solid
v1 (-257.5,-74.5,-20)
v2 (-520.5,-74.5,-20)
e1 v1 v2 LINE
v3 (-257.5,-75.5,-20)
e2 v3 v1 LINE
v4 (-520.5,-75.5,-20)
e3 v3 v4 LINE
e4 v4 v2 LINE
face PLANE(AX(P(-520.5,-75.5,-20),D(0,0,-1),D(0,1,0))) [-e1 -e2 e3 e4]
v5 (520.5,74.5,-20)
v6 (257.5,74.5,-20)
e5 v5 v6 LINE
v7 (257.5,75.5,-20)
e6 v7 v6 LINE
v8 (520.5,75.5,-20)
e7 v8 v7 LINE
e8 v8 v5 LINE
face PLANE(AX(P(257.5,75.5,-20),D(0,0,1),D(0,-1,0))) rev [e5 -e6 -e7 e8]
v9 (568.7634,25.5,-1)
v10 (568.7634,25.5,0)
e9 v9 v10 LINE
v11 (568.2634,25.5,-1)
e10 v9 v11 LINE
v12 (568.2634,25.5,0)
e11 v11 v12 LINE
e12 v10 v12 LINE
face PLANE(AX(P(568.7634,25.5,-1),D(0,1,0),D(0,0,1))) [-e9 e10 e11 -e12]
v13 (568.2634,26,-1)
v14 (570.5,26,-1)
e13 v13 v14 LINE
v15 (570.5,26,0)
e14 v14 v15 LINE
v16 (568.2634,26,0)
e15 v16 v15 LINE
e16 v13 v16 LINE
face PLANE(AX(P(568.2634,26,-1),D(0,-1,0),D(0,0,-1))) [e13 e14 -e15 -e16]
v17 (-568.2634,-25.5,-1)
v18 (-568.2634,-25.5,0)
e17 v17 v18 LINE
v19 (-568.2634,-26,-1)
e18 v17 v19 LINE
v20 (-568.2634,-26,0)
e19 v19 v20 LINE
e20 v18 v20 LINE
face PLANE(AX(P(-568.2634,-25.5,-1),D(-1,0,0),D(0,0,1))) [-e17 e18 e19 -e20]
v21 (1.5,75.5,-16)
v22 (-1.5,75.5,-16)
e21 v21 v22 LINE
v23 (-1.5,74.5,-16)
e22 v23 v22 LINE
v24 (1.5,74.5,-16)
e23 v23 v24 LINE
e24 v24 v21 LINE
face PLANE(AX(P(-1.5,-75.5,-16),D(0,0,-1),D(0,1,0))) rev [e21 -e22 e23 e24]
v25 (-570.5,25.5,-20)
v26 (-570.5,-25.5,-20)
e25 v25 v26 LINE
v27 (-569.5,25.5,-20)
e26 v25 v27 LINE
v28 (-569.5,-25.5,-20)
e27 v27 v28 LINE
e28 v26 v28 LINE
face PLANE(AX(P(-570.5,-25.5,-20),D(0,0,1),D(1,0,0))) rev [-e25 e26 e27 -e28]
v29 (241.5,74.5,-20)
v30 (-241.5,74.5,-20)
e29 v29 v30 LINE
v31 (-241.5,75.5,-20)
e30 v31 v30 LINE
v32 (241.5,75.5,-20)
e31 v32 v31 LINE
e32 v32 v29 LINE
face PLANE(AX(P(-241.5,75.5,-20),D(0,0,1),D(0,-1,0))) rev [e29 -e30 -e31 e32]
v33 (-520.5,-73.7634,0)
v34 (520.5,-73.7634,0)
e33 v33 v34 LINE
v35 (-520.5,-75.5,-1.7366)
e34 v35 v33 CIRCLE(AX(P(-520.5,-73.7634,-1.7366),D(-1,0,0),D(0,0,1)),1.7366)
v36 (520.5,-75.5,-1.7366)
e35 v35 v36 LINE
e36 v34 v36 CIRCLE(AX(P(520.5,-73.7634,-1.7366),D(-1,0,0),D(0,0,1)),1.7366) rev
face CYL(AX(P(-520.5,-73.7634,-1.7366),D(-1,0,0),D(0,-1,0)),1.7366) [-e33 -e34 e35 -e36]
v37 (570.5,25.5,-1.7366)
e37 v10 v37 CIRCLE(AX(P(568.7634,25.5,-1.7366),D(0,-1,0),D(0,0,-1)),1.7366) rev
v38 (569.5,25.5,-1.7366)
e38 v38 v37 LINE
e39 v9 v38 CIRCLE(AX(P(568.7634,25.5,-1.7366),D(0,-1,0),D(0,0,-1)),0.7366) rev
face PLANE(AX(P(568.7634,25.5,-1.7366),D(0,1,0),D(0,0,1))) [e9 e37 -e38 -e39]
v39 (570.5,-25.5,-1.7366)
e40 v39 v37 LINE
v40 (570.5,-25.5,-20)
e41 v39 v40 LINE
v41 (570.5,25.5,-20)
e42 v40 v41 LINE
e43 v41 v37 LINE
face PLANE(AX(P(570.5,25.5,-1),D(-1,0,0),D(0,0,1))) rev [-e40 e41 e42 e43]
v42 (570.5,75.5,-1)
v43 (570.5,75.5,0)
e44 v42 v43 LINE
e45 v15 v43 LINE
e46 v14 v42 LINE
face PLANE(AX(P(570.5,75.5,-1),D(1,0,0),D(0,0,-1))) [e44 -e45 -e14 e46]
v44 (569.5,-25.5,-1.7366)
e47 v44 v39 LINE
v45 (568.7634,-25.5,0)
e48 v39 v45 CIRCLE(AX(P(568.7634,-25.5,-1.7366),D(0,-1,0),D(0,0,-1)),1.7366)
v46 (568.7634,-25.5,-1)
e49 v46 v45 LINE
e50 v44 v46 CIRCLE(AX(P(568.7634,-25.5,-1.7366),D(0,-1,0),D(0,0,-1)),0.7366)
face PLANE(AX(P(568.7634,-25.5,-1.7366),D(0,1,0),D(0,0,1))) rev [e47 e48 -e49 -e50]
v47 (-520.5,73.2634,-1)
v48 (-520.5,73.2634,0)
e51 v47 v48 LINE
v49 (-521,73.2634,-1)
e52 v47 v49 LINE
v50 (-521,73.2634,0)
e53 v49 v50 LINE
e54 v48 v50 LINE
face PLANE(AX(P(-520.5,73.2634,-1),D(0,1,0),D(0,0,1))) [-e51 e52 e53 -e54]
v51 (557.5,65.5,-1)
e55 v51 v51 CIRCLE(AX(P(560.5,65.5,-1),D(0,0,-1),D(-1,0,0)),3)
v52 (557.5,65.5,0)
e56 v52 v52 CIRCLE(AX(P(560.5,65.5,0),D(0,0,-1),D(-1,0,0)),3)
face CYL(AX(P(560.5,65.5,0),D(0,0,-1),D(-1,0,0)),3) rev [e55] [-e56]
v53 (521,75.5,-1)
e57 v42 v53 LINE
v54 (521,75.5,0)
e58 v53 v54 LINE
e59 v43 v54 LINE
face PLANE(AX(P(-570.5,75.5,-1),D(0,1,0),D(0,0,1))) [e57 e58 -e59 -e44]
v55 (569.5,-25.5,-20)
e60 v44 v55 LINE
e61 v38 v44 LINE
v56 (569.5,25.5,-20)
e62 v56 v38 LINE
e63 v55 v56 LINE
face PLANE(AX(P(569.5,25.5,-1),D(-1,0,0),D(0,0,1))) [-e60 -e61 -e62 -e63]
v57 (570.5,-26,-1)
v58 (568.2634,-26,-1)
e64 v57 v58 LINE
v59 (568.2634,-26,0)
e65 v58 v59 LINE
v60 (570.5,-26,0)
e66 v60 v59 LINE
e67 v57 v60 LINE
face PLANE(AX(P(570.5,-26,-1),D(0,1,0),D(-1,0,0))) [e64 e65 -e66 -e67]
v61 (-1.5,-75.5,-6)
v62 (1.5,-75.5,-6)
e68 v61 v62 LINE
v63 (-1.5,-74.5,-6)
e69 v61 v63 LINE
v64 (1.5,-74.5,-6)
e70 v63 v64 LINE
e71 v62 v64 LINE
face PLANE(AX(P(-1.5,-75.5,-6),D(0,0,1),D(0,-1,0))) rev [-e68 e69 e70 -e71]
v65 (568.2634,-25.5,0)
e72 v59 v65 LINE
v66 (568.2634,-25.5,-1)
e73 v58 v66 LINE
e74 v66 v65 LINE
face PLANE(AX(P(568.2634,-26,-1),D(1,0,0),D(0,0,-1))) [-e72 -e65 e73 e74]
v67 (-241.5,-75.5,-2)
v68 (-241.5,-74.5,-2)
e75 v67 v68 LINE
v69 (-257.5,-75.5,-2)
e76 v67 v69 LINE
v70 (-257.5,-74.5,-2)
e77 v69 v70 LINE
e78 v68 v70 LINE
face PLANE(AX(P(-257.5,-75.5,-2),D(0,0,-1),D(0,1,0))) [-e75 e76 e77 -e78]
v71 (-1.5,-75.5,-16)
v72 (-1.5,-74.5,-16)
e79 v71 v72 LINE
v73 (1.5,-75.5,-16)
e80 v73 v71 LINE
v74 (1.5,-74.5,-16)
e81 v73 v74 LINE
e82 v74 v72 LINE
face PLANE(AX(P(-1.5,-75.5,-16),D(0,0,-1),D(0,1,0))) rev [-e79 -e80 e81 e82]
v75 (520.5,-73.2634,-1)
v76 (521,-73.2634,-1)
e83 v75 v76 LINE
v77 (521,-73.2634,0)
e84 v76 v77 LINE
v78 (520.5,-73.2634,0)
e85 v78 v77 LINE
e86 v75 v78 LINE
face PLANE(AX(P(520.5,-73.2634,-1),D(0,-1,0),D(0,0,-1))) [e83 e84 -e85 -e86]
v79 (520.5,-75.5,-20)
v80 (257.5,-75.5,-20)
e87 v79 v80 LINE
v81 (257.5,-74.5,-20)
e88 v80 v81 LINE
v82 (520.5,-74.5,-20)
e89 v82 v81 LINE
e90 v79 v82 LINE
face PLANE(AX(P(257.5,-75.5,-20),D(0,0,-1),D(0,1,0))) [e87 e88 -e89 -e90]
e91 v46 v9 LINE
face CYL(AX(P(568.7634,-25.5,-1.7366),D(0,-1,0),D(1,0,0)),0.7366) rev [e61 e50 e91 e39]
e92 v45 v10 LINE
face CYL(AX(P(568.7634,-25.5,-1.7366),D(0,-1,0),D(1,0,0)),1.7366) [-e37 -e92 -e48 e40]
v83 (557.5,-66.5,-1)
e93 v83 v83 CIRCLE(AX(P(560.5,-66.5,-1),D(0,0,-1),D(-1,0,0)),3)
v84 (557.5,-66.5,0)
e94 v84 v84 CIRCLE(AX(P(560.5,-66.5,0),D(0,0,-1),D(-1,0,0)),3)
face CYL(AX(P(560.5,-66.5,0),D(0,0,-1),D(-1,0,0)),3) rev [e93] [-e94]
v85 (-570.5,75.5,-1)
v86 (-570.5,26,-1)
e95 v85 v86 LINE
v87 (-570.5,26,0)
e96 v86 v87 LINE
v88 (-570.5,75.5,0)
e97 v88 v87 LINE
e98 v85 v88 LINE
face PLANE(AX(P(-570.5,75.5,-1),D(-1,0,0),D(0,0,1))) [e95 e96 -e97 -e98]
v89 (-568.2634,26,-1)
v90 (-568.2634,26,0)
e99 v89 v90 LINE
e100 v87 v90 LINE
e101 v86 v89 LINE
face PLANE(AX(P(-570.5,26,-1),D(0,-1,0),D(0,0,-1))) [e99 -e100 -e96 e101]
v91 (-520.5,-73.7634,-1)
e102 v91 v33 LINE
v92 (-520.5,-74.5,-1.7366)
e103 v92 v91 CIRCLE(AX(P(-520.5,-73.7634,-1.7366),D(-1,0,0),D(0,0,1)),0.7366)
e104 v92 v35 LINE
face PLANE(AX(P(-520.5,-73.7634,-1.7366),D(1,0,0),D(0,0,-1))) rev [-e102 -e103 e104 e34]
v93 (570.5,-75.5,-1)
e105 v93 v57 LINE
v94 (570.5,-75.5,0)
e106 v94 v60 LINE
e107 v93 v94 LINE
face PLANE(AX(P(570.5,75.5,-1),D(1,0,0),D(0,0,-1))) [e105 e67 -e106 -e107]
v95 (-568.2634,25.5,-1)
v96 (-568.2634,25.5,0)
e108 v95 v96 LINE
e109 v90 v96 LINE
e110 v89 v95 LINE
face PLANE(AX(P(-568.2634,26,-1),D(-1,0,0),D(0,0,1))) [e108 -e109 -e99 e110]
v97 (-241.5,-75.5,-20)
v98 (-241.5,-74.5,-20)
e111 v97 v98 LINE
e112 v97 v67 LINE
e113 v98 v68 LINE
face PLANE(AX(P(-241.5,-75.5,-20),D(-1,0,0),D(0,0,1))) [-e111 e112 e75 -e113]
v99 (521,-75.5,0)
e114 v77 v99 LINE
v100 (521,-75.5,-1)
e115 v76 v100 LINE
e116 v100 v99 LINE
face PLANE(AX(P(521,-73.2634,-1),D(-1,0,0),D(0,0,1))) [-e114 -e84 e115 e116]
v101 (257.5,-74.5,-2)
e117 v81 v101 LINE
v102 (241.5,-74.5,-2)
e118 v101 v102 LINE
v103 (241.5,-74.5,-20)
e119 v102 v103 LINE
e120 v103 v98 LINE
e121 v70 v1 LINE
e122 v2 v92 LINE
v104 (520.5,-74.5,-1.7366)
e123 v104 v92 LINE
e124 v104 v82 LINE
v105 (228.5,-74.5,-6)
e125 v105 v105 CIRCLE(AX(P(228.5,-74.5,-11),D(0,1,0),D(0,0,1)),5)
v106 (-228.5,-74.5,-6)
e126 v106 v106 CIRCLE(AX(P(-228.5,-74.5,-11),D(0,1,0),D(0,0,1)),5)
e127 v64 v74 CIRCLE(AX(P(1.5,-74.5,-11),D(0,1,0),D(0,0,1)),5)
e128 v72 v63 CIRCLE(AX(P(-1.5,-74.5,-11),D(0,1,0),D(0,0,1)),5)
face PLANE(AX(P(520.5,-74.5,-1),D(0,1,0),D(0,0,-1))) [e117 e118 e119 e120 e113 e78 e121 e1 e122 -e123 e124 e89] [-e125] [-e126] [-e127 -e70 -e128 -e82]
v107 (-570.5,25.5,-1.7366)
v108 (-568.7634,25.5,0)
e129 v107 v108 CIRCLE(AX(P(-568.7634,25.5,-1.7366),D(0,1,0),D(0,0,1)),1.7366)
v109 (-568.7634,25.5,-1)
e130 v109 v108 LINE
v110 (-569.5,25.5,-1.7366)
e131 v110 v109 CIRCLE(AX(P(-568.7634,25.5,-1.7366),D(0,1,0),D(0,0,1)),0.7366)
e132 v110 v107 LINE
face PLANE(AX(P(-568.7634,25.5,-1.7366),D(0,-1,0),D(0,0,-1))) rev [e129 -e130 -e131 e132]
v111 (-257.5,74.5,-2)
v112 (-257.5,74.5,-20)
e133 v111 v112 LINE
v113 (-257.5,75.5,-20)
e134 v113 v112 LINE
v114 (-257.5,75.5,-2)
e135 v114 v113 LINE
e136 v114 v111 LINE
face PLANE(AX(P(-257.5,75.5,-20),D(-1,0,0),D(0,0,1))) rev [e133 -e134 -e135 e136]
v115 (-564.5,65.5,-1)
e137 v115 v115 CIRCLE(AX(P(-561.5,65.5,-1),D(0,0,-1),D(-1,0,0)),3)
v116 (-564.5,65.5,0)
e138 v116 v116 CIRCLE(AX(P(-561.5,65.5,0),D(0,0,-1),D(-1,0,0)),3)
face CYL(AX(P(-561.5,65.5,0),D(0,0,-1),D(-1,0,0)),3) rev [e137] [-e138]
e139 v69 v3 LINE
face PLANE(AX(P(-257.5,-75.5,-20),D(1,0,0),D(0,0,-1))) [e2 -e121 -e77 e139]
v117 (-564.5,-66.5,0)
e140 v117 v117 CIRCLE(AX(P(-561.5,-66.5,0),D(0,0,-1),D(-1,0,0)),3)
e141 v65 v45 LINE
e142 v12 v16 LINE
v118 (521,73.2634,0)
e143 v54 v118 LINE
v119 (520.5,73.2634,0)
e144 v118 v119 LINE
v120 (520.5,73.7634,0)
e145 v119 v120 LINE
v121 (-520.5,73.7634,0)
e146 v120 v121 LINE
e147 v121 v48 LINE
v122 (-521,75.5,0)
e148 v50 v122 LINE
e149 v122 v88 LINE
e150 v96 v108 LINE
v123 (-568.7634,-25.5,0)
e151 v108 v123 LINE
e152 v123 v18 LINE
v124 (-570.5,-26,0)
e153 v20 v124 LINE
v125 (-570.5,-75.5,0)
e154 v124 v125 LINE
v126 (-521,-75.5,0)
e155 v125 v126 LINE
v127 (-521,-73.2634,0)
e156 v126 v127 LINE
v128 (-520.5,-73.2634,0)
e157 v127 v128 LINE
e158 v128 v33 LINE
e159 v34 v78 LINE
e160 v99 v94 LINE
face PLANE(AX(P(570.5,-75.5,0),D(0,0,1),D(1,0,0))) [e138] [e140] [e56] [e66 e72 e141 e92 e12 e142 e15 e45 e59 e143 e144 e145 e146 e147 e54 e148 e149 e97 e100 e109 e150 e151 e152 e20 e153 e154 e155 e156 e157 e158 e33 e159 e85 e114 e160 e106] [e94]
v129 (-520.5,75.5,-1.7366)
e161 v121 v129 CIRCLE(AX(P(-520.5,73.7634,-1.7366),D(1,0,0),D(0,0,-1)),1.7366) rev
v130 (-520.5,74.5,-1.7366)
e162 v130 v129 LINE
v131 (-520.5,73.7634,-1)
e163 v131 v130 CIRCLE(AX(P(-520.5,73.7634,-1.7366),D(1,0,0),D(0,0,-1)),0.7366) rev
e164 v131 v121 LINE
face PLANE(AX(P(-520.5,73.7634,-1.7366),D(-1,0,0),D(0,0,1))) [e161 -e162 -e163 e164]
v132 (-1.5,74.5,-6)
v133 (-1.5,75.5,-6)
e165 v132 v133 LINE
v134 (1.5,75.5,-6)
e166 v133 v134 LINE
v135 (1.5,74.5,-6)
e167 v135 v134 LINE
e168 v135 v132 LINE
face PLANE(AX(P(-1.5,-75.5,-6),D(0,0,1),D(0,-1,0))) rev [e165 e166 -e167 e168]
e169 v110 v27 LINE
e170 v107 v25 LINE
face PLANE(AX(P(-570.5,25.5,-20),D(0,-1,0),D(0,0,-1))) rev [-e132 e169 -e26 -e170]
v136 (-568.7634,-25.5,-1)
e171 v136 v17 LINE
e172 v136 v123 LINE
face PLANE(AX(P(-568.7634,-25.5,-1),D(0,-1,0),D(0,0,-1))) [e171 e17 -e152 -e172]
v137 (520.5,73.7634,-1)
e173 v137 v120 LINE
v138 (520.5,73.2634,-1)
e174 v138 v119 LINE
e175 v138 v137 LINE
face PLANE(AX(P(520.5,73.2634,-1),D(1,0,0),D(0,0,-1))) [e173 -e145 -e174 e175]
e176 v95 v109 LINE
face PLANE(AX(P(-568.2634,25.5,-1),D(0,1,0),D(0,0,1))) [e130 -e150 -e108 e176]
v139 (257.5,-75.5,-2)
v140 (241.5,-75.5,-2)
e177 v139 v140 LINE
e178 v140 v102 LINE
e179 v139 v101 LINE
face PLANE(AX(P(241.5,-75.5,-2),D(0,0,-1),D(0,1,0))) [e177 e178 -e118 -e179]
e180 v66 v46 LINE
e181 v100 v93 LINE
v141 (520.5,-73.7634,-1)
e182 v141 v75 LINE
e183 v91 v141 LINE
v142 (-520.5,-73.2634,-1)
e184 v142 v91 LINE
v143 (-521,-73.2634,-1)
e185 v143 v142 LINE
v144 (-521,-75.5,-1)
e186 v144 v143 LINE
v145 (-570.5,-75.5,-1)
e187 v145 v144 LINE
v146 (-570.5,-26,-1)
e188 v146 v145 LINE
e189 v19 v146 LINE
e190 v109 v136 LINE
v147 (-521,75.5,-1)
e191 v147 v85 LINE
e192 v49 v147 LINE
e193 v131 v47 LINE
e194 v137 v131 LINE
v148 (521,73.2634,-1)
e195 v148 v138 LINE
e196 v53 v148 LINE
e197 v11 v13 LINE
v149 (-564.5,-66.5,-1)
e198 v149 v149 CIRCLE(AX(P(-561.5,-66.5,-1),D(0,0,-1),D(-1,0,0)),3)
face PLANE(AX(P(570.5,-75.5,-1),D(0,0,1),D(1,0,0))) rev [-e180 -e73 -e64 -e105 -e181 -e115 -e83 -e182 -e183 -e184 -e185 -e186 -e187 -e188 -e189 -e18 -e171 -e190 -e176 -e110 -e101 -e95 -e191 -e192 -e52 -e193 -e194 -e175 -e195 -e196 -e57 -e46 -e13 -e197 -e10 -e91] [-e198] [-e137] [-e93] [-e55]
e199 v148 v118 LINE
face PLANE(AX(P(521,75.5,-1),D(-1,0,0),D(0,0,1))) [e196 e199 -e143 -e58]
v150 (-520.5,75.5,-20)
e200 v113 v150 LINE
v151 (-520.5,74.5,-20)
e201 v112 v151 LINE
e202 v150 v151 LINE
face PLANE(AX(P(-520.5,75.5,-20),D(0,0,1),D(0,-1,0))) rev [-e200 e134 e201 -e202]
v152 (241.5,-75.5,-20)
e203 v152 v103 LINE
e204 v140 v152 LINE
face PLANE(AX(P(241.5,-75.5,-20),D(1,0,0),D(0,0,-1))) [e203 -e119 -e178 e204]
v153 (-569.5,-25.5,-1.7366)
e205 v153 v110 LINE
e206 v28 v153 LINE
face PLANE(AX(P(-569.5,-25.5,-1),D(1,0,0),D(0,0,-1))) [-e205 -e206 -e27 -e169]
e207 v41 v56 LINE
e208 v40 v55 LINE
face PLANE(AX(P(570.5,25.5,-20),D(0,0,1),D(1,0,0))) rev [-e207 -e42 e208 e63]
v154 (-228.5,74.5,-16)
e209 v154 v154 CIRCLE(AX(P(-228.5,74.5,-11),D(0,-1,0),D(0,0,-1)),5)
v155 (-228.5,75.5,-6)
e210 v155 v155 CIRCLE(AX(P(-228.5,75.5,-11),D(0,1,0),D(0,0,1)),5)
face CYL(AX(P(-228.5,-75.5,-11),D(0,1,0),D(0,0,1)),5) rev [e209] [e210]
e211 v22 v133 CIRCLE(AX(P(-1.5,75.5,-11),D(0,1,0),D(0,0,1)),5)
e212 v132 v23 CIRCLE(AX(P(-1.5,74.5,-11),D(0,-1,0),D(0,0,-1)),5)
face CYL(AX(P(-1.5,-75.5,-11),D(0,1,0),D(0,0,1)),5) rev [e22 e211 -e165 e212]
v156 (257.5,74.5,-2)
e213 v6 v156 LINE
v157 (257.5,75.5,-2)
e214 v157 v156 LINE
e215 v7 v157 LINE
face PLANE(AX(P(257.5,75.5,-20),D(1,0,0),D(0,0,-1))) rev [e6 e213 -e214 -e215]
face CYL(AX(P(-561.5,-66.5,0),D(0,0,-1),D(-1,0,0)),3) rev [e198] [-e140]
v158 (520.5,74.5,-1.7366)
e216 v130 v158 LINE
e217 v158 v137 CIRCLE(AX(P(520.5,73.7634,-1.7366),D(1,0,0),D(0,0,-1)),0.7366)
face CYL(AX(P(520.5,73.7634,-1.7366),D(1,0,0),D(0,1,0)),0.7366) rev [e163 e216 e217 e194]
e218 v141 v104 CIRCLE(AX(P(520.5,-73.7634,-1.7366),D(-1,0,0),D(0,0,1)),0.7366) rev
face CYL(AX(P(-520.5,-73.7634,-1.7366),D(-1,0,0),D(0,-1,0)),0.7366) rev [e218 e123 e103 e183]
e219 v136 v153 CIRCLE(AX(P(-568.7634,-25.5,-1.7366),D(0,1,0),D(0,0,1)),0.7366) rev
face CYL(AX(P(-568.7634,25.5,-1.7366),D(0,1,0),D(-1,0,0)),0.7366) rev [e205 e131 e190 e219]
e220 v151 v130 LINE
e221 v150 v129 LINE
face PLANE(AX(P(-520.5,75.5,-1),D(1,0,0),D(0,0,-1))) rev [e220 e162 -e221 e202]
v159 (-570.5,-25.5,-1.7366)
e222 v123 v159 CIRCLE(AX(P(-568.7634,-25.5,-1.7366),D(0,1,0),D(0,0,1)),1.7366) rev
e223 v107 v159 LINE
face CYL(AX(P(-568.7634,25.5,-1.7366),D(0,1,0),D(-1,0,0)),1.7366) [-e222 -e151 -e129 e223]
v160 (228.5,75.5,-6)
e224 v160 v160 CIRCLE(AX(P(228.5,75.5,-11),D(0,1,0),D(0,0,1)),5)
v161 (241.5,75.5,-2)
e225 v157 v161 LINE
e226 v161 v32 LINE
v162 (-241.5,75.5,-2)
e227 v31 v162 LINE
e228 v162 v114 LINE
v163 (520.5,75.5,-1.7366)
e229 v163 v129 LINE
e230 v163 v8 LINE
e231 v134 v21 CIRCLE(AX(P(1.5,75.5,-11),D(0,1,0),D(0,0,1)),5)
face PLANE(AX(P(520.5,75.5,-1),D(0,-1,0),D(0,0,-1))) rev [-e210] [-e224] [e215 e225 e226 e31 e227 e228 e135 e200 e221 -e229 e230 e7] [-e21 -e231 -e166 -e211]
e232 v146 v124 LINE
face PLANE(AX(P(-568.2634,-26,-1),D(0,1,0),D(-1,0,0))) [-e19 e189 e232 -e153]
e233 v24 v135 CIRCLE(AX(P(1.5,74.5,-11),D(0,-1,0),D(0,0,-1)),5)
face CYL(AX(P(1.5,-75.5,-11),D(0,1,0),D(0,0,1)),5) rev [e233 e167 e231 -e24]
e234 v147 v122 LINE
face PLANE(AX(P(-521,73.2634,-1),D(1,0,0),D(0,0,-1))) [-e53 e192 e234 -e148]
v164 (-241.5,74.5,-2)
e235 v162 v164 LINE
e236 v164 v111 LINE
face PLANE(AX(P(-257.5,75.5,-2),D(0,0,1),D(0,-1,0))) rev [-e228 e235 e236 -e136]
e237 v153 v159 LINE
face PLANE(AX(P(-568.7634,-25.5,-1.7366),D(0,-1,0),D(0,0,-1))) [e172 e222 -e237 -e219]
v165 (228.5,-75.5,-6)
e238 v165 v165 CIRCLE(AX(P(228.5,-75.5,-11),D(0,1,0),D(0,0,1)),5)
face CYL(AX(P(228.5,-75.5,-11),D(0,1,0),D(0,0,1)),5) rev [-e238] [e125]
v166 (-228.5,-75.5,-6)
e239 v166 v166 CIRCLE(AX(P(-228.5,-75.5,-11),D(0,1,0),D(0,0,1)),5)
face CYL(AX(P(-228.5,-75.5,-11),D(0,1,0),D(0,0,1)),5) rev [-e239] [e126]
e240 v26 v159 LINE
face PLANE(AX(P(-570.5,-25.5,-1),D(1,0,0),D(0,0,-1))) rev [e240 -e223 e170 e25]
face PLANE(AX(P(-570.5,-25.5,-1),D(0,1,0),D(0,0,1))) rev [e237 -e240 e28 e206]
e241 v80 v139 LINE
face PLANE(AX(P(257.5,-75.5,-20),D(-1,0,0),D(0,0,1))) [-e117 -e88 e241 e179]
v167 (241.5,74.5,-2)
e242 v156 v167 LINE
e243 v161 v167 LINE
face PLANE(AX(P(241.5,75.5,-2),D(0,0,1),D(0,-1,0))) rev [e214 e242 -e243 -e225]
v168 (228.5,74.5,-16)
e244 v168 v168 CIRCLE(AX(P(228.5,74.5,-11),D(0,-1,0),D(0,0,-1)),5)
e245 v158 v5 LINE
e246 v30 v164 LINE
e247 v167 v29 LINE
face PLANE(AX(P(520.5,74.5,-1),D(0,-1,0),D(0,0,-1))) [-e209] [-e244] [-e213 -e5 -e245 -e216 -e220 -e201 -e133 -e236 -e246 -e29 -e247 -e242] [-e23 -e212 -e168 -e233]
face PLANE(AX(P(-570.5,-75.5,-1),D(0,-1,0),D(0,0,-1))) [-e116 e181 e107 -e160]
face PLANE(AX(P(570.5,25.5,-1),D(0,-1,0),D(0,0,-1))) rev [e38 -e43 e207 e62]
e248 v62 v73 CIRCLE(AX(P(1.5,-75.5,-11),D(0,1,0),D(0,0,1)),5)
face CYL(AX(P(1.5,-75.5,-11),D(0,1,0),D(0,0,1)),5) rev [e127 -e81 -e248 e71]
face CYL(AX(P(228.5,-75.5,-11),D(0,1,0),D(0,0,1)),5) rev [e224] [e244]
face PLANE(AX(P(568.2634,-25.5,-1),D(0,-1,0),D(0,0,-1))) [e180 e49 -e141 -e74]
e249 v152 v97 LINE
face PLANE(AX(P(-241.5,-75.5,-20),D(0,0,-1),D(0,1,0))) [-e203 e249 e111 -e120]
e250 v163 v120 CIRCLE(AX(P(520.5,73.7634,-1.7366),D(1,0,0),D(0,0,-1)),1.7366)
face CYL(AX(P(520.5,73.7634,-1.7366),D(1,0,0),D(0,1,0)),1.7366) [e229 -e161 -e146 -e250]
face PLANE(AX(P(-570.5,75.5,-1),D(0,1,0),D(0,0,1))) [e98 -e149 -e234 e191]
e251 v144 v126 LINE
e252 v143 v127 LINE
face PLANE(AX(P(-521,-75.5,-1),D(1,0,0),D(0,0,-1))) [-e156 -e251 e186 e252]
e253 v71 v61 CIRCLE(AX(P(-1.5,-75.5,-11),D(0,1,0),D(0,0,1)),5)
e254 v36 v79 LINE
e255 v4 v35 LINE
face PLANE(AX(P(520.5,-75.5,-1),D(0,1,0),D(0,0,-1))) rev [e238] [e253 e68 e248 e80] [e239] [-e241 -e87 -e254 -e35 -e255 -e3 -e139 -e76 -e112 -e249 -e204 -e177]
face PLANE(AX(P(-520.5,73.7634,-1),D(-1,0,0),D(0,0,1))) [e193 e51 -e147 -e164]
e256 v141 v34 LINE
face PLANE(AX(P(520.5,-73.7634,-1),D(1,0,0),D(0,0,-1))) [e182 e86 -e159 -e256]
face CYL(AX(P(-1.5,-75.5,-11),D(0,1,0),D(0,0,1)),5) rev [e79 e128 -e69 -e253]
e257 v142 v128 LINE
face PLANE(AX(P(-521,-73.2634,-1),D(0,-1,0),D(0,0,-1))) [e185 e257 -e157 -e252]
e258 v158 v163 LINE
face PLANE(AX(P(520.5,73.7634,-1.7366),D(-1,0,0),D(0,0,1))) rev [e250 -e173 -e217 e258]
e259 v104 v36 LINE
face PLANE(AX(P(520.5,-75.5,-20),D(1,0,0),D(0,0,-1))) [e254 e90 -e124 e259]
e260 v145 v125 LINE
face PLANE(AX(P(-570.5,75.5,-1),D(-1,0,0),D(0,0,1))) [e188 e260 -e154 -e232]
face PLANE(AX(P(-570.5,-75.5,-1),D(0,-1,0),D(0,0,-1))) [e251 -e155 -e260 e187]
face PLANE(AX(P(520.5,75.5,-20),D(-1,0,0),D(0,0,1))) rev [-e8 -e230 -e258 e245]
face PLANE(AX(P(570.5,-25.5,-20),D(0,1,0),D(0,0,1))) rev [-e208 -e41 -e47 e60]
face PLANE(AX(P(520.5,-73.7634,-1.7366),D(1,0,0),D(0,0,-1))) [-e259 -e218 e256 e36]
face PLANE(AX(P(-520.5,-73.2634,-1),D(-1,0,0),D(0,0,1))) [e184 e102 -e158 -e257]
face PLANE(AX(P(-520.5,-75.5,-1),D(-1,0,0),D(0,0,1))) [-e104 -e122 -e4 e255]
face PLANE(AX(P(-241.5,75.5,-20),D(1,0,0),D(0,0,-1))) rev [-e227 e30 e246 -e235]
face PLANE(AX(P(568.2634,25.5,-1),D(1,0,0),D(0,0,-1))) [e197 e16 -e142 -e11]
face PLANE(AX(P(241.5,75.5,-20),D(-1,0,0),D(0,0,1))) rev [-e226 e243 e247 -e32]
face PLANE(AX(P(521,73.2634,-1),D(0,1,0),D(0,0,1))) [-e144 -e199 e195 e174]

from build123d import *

# Parameters (mm, degrees)
SKETCH_1_W                        = 1141
SKETCH_1_H                        = 151
SM_BASE_FLANGE_1_DEPTH            = 1
SM_EDGE_FLANGE_1_STRIP_W          = 5.4732
SM_EDGE_FLANGE_1_STRIP_H          = 1
SM_EDGE_FLANGE_1_STRIP_CUT_DEPTH  = 51
SM_EDGE_FLANGE_1_RELIEF_W         = 5.9732
SM_EDGE_FLANGE_1_RELIEF_H         = 0.5
SM_EDGE_FLANGE_1_RELIEF_CUT_DEPTH = 1
SM_EDGE_FLANGE_1_DEPTH            = 51
SM_EDGE_FLANGE_2_STRIP_W          = 5.4732
SM_EDGE_FLANGE_2_STRIP_H          = 1
SM_EDGE_FLANGE_2_STRIP_CUT_DEPTH  = 1041
SM_EDGE_FLANGE_2_RELIEF_W         = 5.9732
SM_EDGE_FLANGE_2_RELIEF_H         = 0.5
SM_EDGE_FLANGE_2_RELIEF_CUT_DEPTH = 1
SM_EDGE_FLANGE_2_DEPTH            = 1041
SM_EDGE_FLANGE_2_FLAT_DEPTH       = 1
SM_EDGE_FLANGE_4_STRIP_W          = 5.4732
SM_EDGE_FLANGE_4_STRIP_H          = 1
SM_EDGE_FLANGE_4_STRIP_CUT_DEPTH  = 51
SM_EDGE_FLANGE_4_RELIEF_W         = 5.9732
SM_EDGE_FLANGE_4_RELIEF_H         = 0.5
SM_EDGE_FLANGE_4_RELIEF_CUT_DEPTH = 1
SM_EDGE_FLANGE_4_DEPTH            = 51
SKETCH_15_R                       = 5
CUT_EXTRUDE_1_DEPTH               = 591.48391172
SKETCH_16_R                       = 3
CUT_EXTRUDE_2_DEPTH               = 576.7877213


# Sheet-metal steps are written as plain solids
with BuildPart() as part:
    # Sketch 1 → 基体-法兰1 (new body)
    with BuildSketch(Plane.XY):
        Rectangle(SKETCH_1_W, SKETCH_1_H)
    extrude(amount=-SM_BASE_FLANGE_1_DEPTH)

    # 边线-法兰1 strip (across the edge) → 边线-法兰1 strip cut (cut)
    with BuildSketch(Plane(origin=(570.5, 25.5, -1), x_dir=(-1, 0, 0), z_dir=(0, -1, 0))):
        with Locations((-1, -0.5)):
            Rectangle(SM_EDGE_FLANGE_1_STRIP_W, SM_EDGE_FLANGE_1_STRIP_H)
    extrude(amount=SM_EDGE_FLANGE_1_STRIP_CUT_DEPTH, mode=Mode.SUBTRACT)

    # 边线-法兰1 relief (on the sheet) → 边线-法兰1 relief cut (cut)
    with BuildSketch(Plane(origin=(568.7634, 25.5, -1), x_dir=(-1, 0, 0), z_dir=(0, 0, -1))):
        with Locations((-2.4866, 0.25)):
            Rectangle(SM_EDGE_FLANGE_1_RELIEF_W, SM_EDGE_FLANGE_1_RELIEF_H)
        with Locations((-2.4866, -51.25)):
            Rectangle(SM_EDGE_FLANGE_1_RELIEF_W, SM_EDGE_FLANGE_1_RELIEF_H)
    extrude(amount=-SM_EDGE_FLANGE_1_RELIEF_CUT_DEPTH, mode=Mode.SUBTRACT)

    # 边线-法兰1 section (across the edge) → 边线-法兰1 (add)
    with BuildSketch(Plane(origin=(570.5, 25.5, -1), x_dir=(-1, 0, 0), z_dir=(0, -1, 0))):
        with BuildLine():
            Line((0, 0.7366), (0, 19))
            Line((0, 19), (1, 19))
            Line((1, 19), (1, 0.7366))
            ThreePointArc((1, 0.7366), (1.215745145, 0.215745145), (1.7366, 0))
            Line((1.7366, 0), (1.7366, -1))
            ThreePointArc((1.7366, -1), (0.508638364, -0.491361636), (0, 0.7366))
        make_face()
    extrude(amount=SM_EDGE_FLANGE_1_DEPTH)

    # 边线-法兰2 strip (across the edge) → 边线-法兰2 strip cut (cut)
    with BuildSketch(Plane(origin=(-520.5, 75.5, -1), x_dir=(0, -1, 0), z_dir=(1, 0, 0))):
        with Locations((-1, -0.5)):
            Rectangle(SM_EDGE_FLANGE_2_STRIP_W, SM_EDGE_FLANGE_2_STRIP_H)
    sm_edge_flange_2_strip_cut = extrude(amount=SM_EDGE_FLANGE_2_STRIP_CUT_DEPTH, mode=Mode.SUBTRACT)

    # 边线-法兰2 relief (on the sheet) → 边线-法兰2 relief cut (cut)
    with BuildSketch(Plane(origin=(-520.5, 73.7634, -1), x_dir=(0, -1, 0), z_dir=(0, 0, -1))):
        with Locations((-2.4866, 0.25)):
            Rectangle(SM_EDGE_FLANGE_2_RELIEF_W, SM_EDGE_FLANGE_2_RELIEF_H)
        with Locations((-2.4866, -1041.25)):
            Rectangle(SM_EDGE_FLANGE_2_RELIEF_W, SM_EDGE_FLANGE_2_RELIEF_H)
    sm_edge_flange_2_relief_cut = extrude(amount=-SM_EDGE_FLANGE_2_RELIEF_CUT_DEPTH, mode=Mode.SUBTRACT)

    # 边线-法兰2 bend section (across the edge) → 边线-法兰2 (add)
    with BuildSketch(Plane(origin=(-520.5, 75.5, -1), x_dir=(0, -1, 0), z_dir=(1, 0, 0))):
        with BuildLine():
            Line((0, 0.7366), (1, 0.7366))
            ThreePointArc((1, 0.7366), (1.215745145, 0.215745145), (1.7366, 0))
            Line((1.7366, 0), (1.7366, -1))
            ThreePointArc((1.7366, -1), (0.508638364, -0.491361636), (0, 0.7366))
        make_face()
    sm_edge_flange_2 = extrude(amount=SM_EDGE_FLANGE_2_DEPTH)

    # 边线-法兰2 profile (on flange) → 边线-法兰2 flat (add)
    with BuildSketch(Plane(origin=(0, 75.5, -1), x_dir=(1, 0, 0), z_dir=(0, 1, 0))):
        Polygon((520.5, 0.7366), (520.5, 19), (257.5, 19), (257.5, 1), (241.5, 1), (241.5, 19), (-241.5, 19), (-241.5, 1), (-257.5, 1), (-257.5, 19), (-520.5, 19), (-520.5, 0.7366), align=None)
    sm_edge_flange_2_flat = extrude(amount=-SM_EDGE_FLANGE_2_FLAT_DEPTH)

    # 边线-法兰4 strip (across the edge) → 边线-法兰4 strip cut (cut)
    with BuildSketch(Plane(origin=(-570.5, -25.5, -1), x_dir=(1, 0, 0), z_dir=(0, 1, 0))):
        with Locations((-1, -0.5)):
            Rectangle(SM_EDGE_FLANGE_4_STRIP_W, SM_EDGE_FLANGE_4_STRIP_H)
    extrude(amount=SM_EDGE_FLANGE_4_STRIP_CUT_DEPTH, mode=Mode.SUBTRACT)

    # 边线-法兰4 relief (on the sheet) → 边线-法兰4 relief cut (cut)
    with BuildSketch(Plane(origin=(-568.7634, -25.5, -1), x_dir=(1, 0, 0), z_dir=(0, 0, -1))):
        with Locations((-2.4866, 0.25)):
            Rectangle(SM_EDGE_FLANGE_4_RELIEF_W, SM_EDGE_FLANGE_4_RELIEF_H)
        with Locations((-2.4866, -51.25)):
            Rectangle(SM_EDGE_FLANGE_4_RELIEF_W, SM_EDGE_FLANGE_4_RELIEF_H)
    extrude(amount=-SM_EDGE_FLANGE_4_RELIEF_CUT_DEPTH, mode=Mode.SUBTRACT)

    # 边线-法兰4 section (across the edge) → 边线-法兰4 (add)
    with BuildSketch(Plane(origin=(-570.5, -25.5, -1), x_dir=(1, 0, 0), z_dir=(0, 1, 0))):
        with BuildLine():
            Line((0, 0.7366), (0, 19))
            Line((0, 19), (1, 19))
            Line((1, 19), (1, 0.7366))
            ThreePointArc((1, 0.7366), (1.215745145, 0.215745145), (1.7366, 0))
            Line((1.7366, 0), (1.7366, -1))
            ThreePointArc((1.7366, -1), (0.508638364, -0.491361636), (0, 0.7366))
        make_face()
    extrude(amount=SM_EDGE_FLANGE_4_DEPTH)

    # 镜向1: 边线-法兰2 strip cut, 边线-法兰2 relief cut, 边线-法兰2, 边线-法兰2 flat across plane
    add(sm_edge_flange_2_strip_cut.mirror(Plane.ZX), mode=Mode.SUBTRACT)
    add(sm_edge_flange_2_relief_cut.mirror(Plane.ZX), mode=Mode.SUBTRACT)
    add(sm_edge_flange_2.mirror(Plane.ZX))
    add(sm_edge_flange_2_flat.mirror(Plane.ZX))

    # 草图15 → 切除-拉伸1 (cut, through all)
    with BuildSketch(Plane(origin=(0, 75.5, 0), x_dir=(1, 0, 0), z_dir=(0, 1, 0))):
        with Locations(Location((-228.5, 11, 0), (0, 0, 270))):
            Circle(SKETCH_15_R)
        with Locations(Location((228.5, 11, 0), (0, 0, 270))):
            Circle(SKETCH_15_R)
        with BuildLine():
            Line((-1.5, 16), (1.5, 16))
            ThreePointArc((1.5, 16), (6.5, 11), (1.5, 6))
            Line((1.5, 6), (-1.5, 6))
            ThreePointArc((-1.5, 6), (-6.5, 11), (-1.5, 16))
        make_face()
    extrude(amount=-CUT_EXTRUDE_1_DEPTH, mode=Mode.SUBTRACT)

    # 草图16 → 切除-拉伸2 (cut, through all)
    with BuildSketch(Plane(origin=(0, 0, -1), x_dir=(-1, 0, 0), z_dir=(0, 0, -1))):
        with Locations((-560.5, -66.5)):
            Circle(SKETCH_16_R)
        with Locations((-560.5, 65.5)):
            Circle(SKETCH_16_R)
        with Locations((561.5, -66.5)):
            Circle(SKETCH_16_R)
        with Locations((561.5, 65.5)):
            Circle(SKETCH_16_R)
    extrude(amount=-CUT_EXTRUDE_2_DEPTH, mode=Mode.SUBTRACT)


solid = part.part
